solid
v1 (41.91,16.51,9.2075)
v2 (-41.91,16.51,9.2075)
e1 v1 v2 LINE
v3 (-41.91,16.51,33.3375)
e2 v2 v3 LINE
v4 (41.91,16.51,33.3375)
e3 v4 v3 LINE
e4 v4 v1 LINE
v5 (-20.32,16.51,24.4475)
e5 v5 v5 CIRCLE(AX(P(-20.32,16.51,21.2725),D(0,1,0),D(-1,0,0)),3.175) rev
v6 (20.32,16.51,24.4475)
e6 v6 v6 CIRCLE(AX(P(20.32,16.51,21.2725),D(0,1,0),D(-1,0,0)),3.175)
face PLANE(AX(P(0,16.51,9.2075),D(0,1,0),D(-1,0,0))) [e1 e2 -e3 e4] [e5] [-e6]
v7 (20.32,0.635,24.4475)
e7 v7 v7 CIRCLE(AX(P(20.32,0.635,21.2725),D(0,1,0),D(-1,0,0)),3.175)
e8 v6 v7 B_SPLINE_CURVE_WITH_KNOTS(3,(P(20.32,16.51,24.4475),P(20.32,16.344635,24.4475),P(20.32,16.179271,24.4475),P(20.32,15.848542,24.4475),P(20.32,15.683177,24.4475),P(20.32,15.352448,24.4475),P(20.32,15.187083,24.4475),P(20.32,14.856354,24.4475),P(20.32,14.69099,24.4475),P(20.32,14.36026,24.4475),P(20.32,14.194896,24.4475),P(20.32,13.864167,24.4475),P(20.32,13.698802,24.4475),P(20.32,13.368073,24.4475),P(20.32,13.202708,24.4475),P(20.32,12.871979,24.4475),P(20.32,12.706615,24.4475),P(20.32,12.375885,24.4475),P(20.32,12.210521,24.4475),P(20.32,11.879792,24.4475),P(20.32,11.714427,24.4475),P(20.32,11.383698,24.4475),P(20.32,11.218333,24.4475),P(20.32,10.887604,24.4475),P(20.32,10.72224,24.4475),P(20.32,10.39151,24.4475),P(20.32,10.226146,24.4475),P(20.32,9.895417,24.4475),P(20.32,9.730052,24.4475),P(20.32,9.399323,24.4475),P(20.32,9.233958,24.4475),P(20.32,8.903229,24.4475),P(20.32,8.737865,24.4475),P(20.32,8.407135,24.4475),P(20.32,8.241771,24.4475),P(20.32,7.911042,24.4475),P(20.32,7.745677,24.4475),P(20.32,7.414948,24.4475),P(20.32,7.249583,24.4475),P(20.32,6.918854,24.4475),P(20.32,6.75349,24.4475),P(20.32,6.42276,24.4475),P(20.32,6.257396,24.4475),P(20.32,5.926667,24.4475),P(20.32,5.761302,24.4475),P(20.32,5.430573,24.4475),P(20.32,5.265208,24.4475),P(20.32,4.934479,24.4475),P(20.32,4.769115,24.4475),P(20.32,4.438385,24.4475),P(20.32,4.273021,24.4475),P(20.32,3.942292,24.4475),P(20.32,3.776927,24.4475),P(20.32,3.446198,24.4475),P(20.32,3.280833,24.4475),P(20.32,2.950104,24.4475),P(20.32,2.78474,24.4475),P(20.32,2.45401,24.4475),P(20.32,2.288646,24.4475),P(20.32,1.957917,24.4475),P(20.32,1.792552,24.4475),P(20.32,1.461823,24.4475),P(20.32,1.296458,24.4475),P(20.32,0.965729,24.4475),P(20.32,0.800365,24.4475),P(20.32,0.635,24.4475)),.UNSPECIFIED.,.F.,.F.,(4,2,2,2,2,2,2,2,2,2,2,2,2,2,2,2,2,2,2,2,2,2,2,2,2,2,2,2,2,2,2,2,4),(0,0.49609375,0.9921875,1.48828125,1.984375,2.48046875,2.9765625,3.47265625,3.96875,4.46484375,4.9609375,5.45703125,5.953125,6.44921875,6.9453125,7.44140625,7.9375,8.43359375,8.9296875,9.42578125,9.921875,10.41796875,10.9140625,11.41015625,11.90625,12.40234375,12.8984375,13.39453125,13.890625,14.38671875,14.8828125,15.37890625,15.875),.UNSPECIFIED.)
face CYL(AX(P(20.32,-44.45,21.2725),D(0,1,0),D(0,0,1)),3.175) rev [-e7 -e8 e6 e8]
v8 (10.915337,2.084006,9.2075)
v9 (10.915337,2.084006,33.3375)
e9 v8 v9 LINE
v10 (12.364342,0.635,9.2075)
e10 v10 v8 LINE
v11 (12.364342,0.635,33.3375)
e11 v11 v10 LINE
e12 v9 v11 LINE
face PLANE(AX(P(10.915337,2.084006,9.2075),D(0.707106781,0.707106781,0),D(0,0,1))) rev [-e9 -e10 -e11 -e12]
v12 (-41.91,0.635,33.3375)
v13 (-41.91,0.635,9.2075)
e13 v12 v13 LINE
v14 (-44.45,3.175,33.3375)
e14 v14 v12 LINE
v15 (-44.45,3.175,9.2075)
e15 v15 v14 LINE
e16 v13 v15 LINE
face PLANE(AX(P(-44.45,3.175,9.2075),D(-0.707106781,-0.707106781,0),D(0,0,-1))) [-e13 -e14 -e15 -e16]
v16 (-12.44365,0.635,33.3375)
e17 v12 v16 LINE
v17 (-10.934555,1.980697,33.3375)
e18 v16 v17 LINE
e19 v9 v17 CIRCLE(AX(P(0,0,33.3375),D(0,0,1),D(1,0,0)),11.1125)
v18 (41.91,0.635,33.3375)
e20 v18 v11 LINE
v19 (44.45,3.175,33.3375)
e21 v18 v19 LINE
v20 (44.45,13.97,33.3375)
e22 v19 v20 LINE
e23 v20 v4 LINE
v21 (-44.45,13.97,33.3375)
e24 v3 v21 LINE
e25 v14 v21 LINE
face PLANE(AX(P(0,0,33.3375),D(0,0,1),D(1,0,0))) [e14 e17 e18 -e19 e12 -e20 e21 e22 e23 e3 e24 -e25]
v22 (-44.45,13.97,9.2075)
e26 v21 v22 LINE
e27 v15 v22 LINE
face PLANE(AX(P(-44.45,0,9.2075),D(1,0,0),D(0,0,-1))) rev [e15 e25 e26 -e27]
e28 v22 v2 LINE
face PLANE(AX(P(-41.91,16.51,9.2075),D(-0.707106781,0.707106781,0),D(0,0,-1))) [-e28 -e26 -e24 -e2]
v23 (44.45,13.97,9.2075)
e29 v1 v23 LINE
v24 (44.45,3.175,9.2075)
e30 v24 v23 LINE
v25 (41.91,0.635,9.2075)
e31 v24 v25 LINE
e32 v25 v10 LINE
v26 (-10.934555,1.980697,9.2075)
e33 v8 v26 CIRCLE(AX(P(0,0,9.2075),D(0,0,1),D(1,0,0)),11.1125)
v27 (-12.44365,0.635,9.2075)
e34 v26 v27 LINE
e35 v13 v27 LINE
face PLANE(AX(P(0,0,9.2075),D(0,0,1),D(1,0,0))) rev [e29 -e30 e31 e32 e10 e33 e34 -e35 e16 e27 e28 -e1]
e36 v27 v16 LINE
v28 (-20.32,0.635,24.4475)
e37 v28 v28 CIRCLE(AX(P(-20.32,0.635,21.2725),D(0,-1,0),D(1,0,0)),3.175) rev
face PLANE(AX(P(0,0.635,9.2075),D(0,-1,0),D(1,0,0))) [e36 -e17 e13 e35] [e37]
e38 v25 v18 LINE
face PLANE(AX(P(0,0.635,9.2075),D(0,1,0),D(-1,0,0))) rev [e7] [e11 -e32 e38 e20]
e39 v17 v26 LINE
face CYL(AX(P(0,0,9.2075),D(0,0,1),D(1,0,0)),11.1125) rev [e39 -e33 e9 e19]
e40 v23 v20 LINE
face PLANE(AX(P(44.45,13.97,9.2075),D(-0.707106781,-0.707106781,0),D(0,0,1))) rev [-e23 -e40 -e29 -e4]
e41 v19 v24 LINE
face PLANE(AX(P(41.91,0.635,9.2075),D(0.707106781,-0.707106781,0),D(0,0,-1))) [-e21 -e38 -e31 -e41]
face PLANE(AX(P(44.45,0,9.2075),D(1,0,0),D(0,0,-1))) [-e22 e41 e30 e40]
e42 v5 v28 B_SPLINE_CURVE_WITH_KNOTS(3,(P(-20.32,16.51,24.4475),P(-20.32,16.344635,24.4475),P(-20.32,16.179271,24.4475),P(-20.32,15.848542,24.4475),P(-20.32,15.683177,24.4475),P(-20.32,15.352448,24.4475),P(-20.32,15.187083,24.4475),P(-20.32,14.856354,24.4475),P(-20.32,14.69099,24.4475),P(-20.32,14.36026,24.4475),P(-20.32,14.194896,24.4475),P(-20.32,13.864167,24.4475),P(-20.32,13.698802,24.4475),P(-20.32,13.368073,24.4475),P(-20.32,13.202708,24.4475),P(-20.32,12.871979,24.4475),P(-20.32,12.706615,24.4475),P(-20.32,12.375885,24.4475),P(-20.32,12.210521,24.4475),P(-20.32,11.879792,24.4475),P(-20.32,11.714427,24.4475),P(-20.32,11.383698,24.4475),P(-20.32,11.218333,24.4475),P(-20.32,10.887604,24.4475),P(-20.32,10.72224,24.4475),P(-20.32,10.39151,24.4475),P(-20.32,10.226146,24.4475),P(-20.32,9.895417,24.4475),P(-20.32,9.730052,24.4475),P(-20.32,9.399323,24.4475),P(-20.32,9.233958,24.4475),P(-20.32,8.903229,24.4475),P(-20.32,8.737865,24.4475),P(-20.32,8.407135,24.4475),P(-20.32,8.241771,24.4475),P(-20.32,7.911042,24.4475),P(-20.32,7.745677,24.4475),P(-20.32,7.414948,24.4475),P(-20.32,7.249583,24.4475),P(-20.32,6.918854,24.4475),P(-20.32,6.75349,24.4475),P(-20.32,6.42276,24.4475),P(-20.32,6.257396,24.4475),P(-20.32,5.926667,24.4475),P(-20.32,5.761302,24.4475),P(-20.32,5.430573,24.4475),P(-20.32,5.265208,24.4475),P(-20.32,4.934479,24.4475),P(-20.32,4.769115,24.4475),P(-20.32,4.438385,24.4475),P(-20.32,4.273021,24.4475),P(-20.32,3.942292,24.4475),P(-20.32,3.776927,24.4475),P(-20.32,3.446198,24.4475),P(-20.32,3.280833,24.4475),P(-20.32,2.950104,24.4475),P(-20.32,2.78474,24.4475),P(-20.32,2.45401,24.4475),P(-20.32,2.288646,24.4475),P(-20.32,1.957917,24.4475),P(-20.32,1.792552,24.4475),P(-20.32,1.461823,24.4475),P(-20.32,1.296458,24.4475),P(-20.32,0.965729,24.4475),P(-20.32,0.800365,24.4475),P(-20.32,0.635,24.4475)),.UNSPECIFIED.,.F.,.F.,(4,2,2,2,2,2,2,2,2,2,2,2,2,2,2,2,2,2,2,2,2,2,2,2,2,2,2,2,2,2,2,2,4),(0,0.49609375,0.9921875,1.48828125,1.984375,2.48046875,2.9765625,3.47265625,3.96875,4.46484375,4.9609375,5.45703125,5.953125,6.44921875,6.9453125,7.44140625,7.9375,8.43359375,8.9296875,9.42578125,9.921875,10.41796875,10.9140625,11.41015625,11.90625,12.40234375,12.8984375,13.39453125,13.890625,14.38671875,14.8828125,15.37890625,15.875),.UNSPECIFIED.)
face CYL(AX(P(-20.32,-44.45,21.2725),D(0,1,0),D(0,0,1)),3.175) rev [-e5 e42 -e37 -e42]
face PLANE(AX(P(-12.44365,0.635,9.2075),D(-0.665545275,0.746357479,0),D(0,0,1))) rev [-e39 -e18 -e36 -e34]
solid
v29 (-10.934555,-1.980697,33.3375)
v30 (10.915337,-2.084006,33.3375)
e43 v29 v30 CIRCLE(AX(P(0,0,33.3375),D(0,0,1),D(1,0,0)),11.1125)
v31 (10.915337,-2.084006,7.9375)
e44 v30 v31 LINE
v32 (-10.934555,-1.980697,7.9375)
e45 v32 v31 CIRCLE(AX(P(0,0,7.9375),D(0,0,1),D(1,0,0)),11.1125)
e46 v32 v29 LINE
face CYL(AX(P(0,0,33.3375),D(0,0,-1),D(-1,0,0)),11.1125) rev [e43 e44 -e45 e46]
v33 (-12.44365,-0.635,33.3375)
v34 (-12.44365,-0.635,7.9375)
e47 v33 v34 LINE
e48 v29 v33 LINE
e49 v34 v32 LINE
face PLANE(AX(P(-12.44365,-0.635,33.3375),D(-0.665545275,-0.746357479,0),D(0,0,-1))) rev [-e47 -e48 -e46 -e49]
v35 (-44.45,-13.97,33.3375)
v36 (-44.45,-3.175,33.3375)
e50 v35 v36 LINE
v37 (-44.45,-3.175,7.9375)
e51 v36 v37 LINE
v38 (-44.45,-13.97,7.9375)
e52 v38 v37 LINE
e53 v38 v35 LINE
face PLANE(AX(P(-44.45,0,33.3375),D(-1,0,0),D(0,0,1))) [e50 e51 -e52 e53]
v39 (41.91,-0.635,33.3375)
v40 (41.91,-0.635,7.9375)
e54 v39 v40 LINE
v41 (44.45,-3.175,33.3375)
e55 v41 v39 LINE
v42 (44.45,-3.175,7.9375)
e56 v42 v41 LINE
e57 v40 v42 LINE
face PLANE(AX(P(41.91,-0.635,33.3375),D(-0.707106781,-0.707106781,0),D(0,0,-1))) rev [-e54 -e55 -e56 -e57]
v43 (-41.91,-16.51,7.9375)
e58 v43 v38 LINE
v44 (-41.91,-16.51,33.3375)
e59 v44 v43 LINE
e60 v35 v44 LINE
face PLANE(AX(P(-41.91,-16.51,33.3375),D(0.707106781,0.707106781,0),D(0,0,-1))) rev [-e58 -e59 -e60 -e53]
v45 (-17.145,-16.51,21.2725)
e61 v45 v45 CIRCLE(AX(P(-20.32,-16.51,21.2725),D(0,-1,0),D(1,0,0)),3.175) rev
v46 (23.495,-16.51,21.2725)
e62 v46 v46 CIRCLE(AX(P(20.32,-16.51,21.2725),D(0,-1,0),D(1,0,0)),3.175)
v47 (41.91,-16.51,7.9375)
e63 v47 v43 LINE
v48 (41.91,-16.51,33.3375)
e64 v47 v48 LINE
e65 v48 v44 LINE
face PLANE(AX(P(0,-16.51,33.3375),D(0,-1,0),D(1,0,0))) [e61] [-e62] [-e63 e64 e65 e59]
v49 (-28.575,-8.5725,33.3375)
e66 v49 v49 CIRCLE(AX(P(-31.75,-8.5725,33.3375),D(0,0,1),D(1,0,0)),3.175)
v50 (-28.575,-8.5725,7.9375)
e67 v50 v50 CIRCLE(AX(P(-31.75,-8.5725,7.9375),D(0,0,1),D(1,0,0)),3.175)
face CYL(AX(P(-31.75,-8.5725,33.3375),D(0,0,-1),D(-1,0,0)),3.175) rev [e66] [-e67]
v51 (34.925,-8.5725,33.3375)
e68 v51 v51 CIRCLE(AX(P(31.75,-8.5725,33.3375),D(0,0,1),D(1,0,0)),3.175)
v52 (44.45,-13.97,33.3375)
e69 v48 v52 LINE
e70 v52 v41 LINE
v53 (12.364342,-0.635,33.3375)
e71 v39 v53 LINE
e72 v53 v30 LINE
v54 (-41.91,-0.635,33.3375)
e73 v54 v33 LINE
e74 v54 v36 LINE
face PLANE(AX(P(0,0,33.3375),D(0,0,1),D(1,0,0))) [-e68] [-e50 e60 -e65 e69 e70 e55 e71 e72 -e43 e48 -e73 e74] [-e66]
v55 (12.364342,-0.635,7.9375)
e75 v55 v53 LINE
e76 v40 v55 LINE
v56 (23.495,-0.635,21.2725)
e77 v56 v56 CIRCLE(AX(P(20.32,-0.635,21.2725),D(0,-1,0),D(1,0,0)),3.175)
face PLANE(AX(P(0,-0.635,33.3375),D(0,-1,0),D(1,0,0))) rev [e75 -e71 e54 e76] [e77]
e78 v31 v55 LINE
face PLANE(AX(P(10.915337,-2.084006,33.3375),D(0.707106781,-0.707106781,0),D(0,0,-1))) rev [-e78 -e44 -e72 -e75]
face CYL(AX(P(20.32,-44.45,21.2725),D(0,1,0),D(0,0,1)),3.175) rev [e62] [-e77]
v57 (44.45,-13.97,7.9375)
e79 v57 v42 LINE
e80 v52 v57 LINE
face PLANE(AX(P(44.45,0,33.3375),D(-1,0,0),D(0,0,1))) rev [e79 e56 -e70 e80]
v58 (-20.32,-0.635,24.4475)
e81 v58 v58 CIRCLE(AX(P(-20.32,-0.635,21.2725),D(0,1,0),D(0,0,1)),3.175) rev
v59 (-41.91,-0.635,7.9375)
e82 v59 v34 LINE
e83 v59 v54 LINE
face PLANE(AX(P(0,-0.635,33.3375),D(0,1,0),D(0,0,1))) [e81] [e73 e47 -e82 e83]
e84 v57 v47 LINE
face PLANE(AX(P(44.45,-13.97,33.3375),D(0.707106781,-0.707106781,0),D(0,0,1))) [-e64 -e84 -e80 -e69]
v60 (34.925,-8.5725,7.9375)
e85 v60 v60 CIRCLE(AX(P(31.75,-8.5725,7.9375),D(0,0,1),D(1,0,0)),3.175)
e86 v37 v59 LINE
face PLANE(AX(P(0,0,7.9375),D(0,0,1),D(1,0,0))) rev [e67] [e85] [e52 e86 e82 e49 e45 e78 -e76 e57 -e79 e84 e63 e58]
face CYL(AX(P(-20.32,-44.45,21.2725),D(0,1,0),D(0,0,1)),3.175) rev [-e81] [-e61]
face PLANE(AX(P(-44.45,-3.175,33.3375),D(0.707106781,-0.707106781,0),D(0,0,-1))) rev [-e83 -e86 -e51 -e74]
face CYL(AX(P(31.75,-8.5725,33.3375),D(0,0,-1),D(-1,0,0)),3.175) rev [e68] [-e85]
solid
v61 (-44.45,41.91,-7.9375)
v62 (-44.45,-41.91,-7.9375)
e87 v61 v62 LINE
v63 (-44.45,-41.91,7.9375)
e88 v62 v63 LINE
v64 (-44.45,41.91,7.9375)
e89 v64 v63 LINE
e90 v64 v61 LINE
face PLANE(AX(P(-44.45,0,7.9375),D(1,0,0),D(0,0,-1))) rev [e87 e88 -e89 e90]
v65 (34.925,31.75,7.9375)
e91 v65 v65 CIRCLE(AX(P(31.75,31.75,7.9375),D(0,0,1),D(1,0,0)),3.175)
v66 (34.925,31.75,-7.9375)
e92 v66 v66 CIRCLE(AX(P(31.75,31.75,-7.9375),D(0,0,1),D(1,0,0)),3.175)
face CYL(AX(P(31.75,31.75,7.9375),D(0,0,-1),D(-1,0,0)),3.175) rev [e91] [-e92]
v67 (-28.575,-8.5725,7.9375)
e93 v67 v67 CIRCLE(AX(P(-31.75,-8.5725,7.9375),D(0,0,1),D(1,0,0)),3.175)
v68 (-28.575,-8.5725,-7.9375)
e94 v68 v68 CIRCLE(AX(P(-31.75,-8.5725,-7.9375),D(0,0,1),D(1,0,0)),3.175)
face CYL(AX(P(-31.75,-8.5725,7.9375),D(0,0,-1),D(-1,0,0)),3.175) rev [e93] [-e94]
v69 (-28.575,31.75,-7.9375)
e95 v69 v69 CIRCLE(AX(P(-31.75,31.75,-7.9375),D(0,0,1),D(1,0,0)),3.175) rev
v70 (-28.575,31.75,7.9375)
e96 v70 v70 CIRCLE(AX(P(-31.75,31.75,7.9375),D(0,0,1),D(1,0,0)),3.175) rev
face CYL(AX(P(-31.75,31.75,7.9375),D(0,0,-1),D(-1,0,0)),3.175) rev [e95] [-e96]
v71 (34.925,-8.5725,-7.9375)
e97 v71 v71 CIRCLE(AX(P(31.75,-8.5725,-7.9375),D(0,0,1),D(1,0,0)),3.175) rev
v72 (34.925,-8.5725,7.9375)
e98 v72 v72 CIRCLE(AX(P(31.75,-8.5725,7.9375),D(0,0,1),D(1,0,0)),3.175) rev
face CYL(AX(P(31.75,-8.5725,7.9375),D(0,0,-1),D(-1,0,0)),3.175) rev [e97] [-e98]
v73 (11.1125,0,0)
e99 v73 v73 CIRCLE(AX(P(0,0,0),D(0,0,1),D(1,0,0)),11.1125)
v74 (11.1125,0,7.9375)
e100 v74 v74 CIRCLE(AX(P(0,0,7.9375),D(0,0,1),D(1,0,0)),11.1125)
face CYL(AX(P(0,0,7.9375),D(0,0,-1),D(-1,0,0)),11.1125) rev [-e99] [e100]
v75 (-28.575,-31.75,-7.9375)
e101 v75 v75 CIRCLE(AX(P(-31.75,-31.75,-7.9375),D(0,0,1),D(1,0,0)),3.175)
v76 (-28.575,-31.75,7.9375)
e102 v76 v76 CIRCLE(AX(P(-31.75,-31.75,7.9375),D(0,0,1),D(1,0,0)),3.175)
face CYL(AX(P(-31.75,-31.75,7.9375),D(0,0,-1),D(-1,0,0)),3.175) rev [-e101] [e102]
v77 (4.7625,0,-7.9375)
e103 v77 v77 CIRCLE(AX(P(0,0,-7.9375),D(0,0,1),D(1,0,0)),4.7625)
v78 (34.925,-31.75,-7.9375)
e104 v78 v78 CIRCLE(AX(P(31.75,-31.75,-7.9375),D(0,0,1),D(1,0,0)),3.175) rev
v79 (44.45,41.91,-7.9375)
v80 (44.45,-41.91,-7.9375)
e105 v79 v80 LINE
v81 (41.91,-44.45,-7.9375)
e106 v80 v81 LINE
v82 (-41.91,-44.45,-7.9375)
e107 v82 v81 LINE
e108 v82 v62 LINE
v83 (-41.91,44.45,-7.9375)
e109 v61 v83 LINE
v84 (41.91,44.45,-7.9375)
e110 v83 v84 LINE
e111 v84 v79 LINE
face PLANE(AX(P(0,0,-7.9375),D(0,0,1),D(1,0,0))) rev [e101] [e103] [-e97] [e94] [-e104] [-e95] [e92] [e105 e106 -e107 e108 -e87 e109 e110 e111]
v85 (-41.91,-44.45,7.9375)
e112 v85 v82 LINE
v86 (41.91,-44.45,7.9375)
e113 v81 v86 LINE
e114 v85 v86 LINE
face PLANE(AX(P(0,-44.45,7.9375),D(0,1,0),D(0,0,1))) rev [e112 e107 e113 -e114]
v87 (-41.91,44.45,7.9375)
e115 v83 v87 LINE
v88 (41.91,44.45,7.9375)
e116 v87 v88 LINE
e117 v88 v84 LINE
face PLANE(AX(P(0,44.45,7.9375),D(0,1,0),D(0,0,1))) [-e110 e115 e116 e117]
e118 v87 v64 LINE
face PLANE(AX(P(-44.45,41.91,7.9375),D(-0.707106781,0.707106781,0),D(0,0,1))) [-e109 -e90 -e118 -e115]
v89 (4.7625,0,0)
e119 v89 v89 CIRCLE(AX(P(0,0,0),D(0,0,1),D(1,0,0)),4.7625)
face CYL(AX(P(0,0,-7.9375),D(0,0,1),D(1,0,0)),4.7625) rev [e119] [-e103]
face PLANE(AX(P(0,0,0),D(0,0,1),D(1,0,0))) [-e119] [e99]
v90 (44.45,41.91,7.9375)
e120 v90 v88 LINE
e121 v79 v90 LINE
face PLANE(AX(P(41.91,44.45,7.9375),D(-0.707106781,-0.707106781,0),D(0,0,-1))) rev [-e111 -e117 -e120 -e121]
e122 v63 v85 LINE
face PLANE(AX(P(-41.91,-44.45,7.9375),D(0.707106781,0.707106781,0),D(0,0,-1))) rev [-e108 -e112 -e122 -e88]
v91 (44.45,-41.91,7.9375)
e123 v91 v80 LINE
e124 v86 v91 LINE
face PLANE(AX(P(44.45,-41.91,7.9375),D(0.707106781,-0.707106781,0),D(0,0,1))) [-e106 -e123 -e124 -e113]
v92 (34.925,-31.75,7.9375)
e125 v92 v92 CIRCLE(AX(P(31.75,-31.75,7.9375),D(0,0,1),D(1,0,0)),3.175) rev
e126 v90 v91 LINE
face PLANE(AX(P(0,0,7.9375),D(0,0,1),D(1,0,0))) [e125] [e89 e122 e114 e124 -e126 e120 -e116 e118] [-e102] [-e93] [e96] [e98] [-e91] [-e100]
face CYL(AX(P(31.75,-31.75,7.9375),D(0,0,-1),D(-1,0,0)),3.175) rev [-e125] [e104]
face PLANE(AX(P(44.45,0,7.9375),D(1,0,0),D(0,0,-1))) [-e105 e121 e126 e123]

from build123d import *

# Parameters (mm, degrees)
SKETCH1_W               = 88.9
SKETCH1_H               = 27.94
SKETCH1_R               = 3.175
BOSS_EXTRUDE1_DEPTH     = 7.9375
BOSS_EXTRUDE2_START     = 7.9375
SKETCH1_3_R             = 3.175
BOSS_EXTRUDE2_DEPTH     = 25.4
BOSS_EXTRUDE3_START     = 33.3375
BOSS_EXTRUDE3_DEPTH     = 24.13
CUT_EXTRUDE1_DEPTH      = 72.154718088
CUT_EXTRUDE1_DEPTH_BACK = 72.154718088
SKETCH2_R               = 3.175
BOSS_EXTRUDE4_START     = -7.9375
SKETCH1_5_W             = 88.9
SKETCH1_5_H             = 88.9
SKETCH1_5_R             = 3.175
SKETCH1_5_R_2           = 4.7625
BOSS_EXTRUDE4_DEPTH     = 7.9375
CHAMFER1_SIZE           = 2.54
CHAMFER2_SIZE           = 2.54
CHAMFER3_SIZE           = 2.54
CHAMFER4_SIZE           = 1.349308072
CHAMFER4_SIZE_2         = 1.27
CHAMFER5_SIZE           = 1.349308072
CHAMFER5_SIZE_2         = 1.27


with BuildPart() as part:
    # Sketch1 → Boss-Extrude1 (new body)
    # profile 1 of 6: a face of its own
    with BuildSketch(Plane.XY):
        with Locations((0, 30.48)):
            Rectangle(SKETCH1_W, SKETCH1_H)
        with Locations((-31.75, 31.75)):
            Circle(SKETCH1_R, mode=Mode.SUBTRACT)
        with Locations((31.75, 31.75)):
            Circle(SKETCH1_R, mode=Mode.SUBTRACT)
    # profile 2 of 6: a face of its own
    with BuildSketch(Plane.XY):
        with BuildLine():
            Line((44.45, 16.51), (-44.45, 16.51))
            Line((-44.45, 16.51), (-44.45, 0.635))
            Line((-44.45, 0.635), (-11.094342308, 0.635))
            ThreePointArc((-11.094342308, 0.635), (0, 11.1125), (11.094342308, 0.635))
            Line((11.094342308, 0.635), (44.45, 0.635))
            Line((44.45, 0.635), (44.45, 16.51))
        make_face()
    # profile 3 of 6: a face of its own
    with BuildSketch(Plane.XY):
        with BuildLine():
            Line((44.45, -16.51), (44.45, -0.635))
            Line((44.45, -0.635), (11.094342308, -0.635))
            ThreePointArc((11.094342308, -0.635), (0, -11.1125), (-11.094342308, -0.635))
            Line((-11.094342308, -0.635), (-44.45, -0.635))
            Line((-44.45, -0.635), (-44.45, -16.51))
            Line((-44.45, -16.51), (44.45, -16.51))
        make_face()
        with Locations((-31.75, -8.5725)):
            Circle(SKETCH1_R, mode=Mode.SUBTRACT)
        with Locations((31.75, -8.5725)):
            Circle(SKETCH1_R, mode=Mode.SUBTRACT)
    # profile 4 of 6: a face of its own
    with BuildSketch(Plane.XY):
        with Locations((0, -30.48)):
            Rectangle(SKETCH1_W, SKETCH1_H)
        with Locations((-31.75, -31.75)):
            Circle(SKETCH1_R, mode=Mode.SUBTRACT)
        with Locations((31.75, -31.75)):
            Circle(SKETCH1_R, mode=Mode.SUBTRACT)
    # profile 5 of 6: a face of its own
    with BuildSketch(Plane.XY):
        with BuildLine():
            Line((-11.094342308, 0.635), (-44.45, 0.635))
            Line((-44.45, 0.635), (-44.45, 0))
            Line((-44.45, 0), (-44.45, -0.635))
            Line((-44.45, -0.635), (-11.094342308, -0.635))
            ThreePointArc((-11.094342308, -0.635), (-11.1125, 0), (-11.094342308, 0.635))
        make_face()
    # profile 6 of 6: a face of its own
    with BuildSketch(Plane.XY):
        with BuildLine():
            Line((44.45, -0.635), (44.45, 0.635))
            Line((44.45, 0.635), (11.094342308, 0.635))
            ThreePointArc((11.094342308, 0.635), (11.107959649, 0.317629777), (11.1125, 0))
            ThreePointArc((11.1125, 0), (11.107959649, -0.317629777), (11.094342308, -0.635))
            Line((11.094342308, -0.635), (44.45, -0.635))
        make_face()
    extrude(amount=BOSS_EXTRUDE1_DEPTH)

    # Sketch1<5> → Boss-Extrude4 (add)
    with BuildSketch(Plane.XY.offset(BOSS_EXTRUDE4_START)):
        Rectangle(SKETCH1_5_W, SKETCH1_5_H)
        with Locations((-31.75, 31.75)):
            Circle(SKETCH1_5_R, mode=Mode.SUBTRACT)
        with Locations((31.75, 31.75)):
            Circle(SKETCH1_5_R, mode=Mode.SUBTRACT)
        Circle(SKETCH1_5_R_2, mode=Mode.SUBTRACT)
        with Locations((31.75, -8.5725)):
            Circle(SKETCH1_5_R, mode=Mode.SUBTRACT)
        with Locations((-31.75, -8.5725)):
            Circle(SKETCH1_5_R, mode=Mode.SUBTRACT)
        with Locations((31.75, -31.75)):
            Circle(SKETCH1_5_R, mode=Mode.SUBTRACT)
        with Locations((-31.75, -31.75)):
            Circle(SKETCH1_5_R, mode=Mode.SUBTRACT)
    extrude(amount=BOSS_EXTRUDE4_DEPTH)

    # Chamfer1
    chamfer1_edges = [part.edges().sort_by_distance(p)[0] for p in [
        (-44.45, -44.45, 0),
        (-44.45, 44.45, 0),
        (44.45, 44.45, 0),
        (44.45, -44.45, 0),
    ]]
    chamfer(chamfer1_edges, length=CHAMFER1_SIZE)


with BuildPart() as body_2:
    # Sketch1<3> → Boss-Extrude2 (new body)
    with BuildSketch(Plane.XY.offset(BOSS_EXTRUDE2_START)):
        with BuildLine():
            Line((44.45, -16.51), (44.45, -0.635))
            Line((44.45, -0.635), (11.094342308, -0.635))
            ThreePointArc((11.094342308, -0.635), (0, -11.1125), (-11.094342308, -0.635))
            Line((-11.094342308, -0.635), (-44.45, -0.635))
            Line((-44.45, -0.635), (-44.45, -16.51))
            Line((-44.45, -16.51), (44.45, -16.51))
        make_face()
        with Locations((-31.75, -8.5725)):
            Circle(SKETCH1_3_R, mode=Mode.SUBTRACT)
        with Locations((31.75, -8.5725)):
            Circle(SKETCH1_3_R, mode=Mode.SUBTRACT)
    extrude(amount=BOSS_EXTRUDE2_DEPTH)


with BuildPart() as body_3:
    # Sketch1<4> → Boss-Extrude3 (new body)
    with BuildSketch(Plane.XY.offset(BOSS_EXTRUDE3_START)):
        with BuildLine():
            Line((44.45, 16.51), (-44.45, 16.51))
            Line((-44.45, 16.51), (-44.45, 0.635))
            Line((-44.45, 0.635), (-11.094342308, 0.635))
            ThreePointArc((-11.094342308, 0.635), (0, 11.1125), (11.094342308, 0.635))
            Line((11.094342308, 0.635), (44.45, 0.635))
            Line((44.45, 0.635), (44.45, 16.51))
        make_face()
    extrude(amount=-BOSS_EXTRUDE3_DEPTH)


with BuildPart() as cut_extrude1_tool:
    # Sketch2 → Cut-Extrude1 (new, two sides: drawn at the far end of the back side and taken through both)
    with BuildSketch(Plane(origin=(0, 0, 0), x_dir=(1, 0, 0), z_dir=(0, 1, 0)).offset(-CUT_EXTRUDE1_DEPTH_BACK)):
        with Locations(Location((20.32, -21.2725, 0), (0, 0, 270))):
            Circle(SKETCH2_R)
        with Locations(Location((-20.32, -21.2725, 0), (0, 0, 270))):
            Circle(SKETCH2_R)
    extrude(amount=CUT_EXTRUDE1_DEPTH + CUT_EXTRUDE1_DEPTH_BACK)


with BuildPart() as body_2_1:
    add(body_2.part)

    # Cut-Extrude1: cut by cut_extrude1_tool
    add(cut_extrude1_tool.part, mode=Mode.SUBTRACT)

    # Chamfer2
    chamfer2_edges = [body_2_1.edges().sort_by_distance(p)[0] for p in [
        (44.45, -16.51, 20.6375),
        (-44.45, -16.51, 20.6375),
        (-44.45, -0.635, 20.6375),
        (44.45, -0.635, 20.6375),
    ]]
    chamfer(chamfer2_edges, length=CHAMFER2_SIZE)

    # Chamfer4
    # the kernel refuses this chamfer: 1.349308072, 1.27 mm, written as the material it takes off along each edge
    with BuildSketch(Plane(origin=(-11.094342308, -0.635, 4.44742728), x_dir=(0.11791105976871491, -0.9930241598189938, 0), z_dir=(0, 0, 1))) as chamfer4_piece_1:
        with BuildLine():
            Line((1.355150635, 0), (-CHAMFER4_SIZE * 0.117911059734, -CHAMFER4_SIZE * 0.993024159525))
            Line((-CHAMFER4_SIZE * 0.117911059734, -CHAMFER4_SIZE * 0.993024159525), (0, 0))
            ThreePointArc((0, 0), (0.697855763, -0.020658022), (1.355150635, 0))
        make_face()
    extrude(amount=32.38014544, mode=Mode.SUBTRACT)
    with BuildSketch(Plane(origin=(11.094342308, -0.635, 4.180143516), x_dir=(1, 0, 0), z_dir=(0, 0, 1))) as chamfer4_piece_2:
        with BuildLine():
            Line((CHAMFER4_SIZE_2, 0), (-0.179005517, -1.449005517))
            ThreePointArc((-0.179005517, -1.449005517), (-0.068318427, -0.748637825), (0, 0))
            Line((0, 0), (CHAMFER4_SIZE_2, 0))
        make_face()
    extrude(amount=32.914712968, mode=Mode.SUBTRACT)


with BuildPart() as body_3_1:
    add(body_3.part)

    # Cut-Extrude1: cut by cut_extrude1_tool
    add(cut_extrude1_tool.part, mode=Mode.SUBTRACT)

    # Chamfer3
    chamfer3_edges = [body_3_1.edges().sort_by_distance(p)[0] for p in [
        (-44.45, 0.635, 21.2725),
        (44.45, 0.635, 21.2725),
        (44.45, 16.51, 21.2725),
        (-44.45, 16.51, 21.2725),
    ]]
    chamfer(chamfer3_edges, length=CHAMFER3_SIZE)

    # Chamfer5
    # the kernel refuses this chamfer: 1.349308072, 1.27 mm, written as the material it takes off along each edge
    with BuildSketch(Plane(origin=(-11.094342308, 0.635, 36.82757272), x_dir=(0.11791105976871363, 0.993024159818994, 0), z_dir=(0, 0, -1))) as chamfer5_piece_1:
        with BuildLine():
            Line((1.355150635, 0), (-CHAMFER5_SIZE * 0.117911059734, -CHAMFER5_SIZE * 0.993024159525))
            Line((-CHAMFER5_SIZE * 0.117911059734, -CHAMFER5_SIZE * 0.993024159525), (0, 0))
            ThreePointArc((0, 0), (0.697855763, -0.020658022), (1.355150635, 0))
        make_face()
    extrude(amount=31.11014544, mode=Mode.SUBTRACT)
    with BuildSketch(Plane(origin=(11.094342308, 0.635, 37.094856484), x_dir=(1, 0, 0), z_dir=(0, 0, -1))) as chamfer5_piece_2:
        with BuildLine():
            Line((CHAMFER5_SIZE_2, 0), (-0.179005517, -1.449005517))
            ThreePointArc((-0.179005517, -1.449005517), (-0.068318427, -0.748637825), (0, 0))
            Line((0, 0), (CHAMFER5_SIZE_2, 0))
        make_face()
    extrude(amount=31.644712968, mode=Mode.SUBTRACT)


solid = Compound([part.part, body_2_1.part, body_3_1.part])
